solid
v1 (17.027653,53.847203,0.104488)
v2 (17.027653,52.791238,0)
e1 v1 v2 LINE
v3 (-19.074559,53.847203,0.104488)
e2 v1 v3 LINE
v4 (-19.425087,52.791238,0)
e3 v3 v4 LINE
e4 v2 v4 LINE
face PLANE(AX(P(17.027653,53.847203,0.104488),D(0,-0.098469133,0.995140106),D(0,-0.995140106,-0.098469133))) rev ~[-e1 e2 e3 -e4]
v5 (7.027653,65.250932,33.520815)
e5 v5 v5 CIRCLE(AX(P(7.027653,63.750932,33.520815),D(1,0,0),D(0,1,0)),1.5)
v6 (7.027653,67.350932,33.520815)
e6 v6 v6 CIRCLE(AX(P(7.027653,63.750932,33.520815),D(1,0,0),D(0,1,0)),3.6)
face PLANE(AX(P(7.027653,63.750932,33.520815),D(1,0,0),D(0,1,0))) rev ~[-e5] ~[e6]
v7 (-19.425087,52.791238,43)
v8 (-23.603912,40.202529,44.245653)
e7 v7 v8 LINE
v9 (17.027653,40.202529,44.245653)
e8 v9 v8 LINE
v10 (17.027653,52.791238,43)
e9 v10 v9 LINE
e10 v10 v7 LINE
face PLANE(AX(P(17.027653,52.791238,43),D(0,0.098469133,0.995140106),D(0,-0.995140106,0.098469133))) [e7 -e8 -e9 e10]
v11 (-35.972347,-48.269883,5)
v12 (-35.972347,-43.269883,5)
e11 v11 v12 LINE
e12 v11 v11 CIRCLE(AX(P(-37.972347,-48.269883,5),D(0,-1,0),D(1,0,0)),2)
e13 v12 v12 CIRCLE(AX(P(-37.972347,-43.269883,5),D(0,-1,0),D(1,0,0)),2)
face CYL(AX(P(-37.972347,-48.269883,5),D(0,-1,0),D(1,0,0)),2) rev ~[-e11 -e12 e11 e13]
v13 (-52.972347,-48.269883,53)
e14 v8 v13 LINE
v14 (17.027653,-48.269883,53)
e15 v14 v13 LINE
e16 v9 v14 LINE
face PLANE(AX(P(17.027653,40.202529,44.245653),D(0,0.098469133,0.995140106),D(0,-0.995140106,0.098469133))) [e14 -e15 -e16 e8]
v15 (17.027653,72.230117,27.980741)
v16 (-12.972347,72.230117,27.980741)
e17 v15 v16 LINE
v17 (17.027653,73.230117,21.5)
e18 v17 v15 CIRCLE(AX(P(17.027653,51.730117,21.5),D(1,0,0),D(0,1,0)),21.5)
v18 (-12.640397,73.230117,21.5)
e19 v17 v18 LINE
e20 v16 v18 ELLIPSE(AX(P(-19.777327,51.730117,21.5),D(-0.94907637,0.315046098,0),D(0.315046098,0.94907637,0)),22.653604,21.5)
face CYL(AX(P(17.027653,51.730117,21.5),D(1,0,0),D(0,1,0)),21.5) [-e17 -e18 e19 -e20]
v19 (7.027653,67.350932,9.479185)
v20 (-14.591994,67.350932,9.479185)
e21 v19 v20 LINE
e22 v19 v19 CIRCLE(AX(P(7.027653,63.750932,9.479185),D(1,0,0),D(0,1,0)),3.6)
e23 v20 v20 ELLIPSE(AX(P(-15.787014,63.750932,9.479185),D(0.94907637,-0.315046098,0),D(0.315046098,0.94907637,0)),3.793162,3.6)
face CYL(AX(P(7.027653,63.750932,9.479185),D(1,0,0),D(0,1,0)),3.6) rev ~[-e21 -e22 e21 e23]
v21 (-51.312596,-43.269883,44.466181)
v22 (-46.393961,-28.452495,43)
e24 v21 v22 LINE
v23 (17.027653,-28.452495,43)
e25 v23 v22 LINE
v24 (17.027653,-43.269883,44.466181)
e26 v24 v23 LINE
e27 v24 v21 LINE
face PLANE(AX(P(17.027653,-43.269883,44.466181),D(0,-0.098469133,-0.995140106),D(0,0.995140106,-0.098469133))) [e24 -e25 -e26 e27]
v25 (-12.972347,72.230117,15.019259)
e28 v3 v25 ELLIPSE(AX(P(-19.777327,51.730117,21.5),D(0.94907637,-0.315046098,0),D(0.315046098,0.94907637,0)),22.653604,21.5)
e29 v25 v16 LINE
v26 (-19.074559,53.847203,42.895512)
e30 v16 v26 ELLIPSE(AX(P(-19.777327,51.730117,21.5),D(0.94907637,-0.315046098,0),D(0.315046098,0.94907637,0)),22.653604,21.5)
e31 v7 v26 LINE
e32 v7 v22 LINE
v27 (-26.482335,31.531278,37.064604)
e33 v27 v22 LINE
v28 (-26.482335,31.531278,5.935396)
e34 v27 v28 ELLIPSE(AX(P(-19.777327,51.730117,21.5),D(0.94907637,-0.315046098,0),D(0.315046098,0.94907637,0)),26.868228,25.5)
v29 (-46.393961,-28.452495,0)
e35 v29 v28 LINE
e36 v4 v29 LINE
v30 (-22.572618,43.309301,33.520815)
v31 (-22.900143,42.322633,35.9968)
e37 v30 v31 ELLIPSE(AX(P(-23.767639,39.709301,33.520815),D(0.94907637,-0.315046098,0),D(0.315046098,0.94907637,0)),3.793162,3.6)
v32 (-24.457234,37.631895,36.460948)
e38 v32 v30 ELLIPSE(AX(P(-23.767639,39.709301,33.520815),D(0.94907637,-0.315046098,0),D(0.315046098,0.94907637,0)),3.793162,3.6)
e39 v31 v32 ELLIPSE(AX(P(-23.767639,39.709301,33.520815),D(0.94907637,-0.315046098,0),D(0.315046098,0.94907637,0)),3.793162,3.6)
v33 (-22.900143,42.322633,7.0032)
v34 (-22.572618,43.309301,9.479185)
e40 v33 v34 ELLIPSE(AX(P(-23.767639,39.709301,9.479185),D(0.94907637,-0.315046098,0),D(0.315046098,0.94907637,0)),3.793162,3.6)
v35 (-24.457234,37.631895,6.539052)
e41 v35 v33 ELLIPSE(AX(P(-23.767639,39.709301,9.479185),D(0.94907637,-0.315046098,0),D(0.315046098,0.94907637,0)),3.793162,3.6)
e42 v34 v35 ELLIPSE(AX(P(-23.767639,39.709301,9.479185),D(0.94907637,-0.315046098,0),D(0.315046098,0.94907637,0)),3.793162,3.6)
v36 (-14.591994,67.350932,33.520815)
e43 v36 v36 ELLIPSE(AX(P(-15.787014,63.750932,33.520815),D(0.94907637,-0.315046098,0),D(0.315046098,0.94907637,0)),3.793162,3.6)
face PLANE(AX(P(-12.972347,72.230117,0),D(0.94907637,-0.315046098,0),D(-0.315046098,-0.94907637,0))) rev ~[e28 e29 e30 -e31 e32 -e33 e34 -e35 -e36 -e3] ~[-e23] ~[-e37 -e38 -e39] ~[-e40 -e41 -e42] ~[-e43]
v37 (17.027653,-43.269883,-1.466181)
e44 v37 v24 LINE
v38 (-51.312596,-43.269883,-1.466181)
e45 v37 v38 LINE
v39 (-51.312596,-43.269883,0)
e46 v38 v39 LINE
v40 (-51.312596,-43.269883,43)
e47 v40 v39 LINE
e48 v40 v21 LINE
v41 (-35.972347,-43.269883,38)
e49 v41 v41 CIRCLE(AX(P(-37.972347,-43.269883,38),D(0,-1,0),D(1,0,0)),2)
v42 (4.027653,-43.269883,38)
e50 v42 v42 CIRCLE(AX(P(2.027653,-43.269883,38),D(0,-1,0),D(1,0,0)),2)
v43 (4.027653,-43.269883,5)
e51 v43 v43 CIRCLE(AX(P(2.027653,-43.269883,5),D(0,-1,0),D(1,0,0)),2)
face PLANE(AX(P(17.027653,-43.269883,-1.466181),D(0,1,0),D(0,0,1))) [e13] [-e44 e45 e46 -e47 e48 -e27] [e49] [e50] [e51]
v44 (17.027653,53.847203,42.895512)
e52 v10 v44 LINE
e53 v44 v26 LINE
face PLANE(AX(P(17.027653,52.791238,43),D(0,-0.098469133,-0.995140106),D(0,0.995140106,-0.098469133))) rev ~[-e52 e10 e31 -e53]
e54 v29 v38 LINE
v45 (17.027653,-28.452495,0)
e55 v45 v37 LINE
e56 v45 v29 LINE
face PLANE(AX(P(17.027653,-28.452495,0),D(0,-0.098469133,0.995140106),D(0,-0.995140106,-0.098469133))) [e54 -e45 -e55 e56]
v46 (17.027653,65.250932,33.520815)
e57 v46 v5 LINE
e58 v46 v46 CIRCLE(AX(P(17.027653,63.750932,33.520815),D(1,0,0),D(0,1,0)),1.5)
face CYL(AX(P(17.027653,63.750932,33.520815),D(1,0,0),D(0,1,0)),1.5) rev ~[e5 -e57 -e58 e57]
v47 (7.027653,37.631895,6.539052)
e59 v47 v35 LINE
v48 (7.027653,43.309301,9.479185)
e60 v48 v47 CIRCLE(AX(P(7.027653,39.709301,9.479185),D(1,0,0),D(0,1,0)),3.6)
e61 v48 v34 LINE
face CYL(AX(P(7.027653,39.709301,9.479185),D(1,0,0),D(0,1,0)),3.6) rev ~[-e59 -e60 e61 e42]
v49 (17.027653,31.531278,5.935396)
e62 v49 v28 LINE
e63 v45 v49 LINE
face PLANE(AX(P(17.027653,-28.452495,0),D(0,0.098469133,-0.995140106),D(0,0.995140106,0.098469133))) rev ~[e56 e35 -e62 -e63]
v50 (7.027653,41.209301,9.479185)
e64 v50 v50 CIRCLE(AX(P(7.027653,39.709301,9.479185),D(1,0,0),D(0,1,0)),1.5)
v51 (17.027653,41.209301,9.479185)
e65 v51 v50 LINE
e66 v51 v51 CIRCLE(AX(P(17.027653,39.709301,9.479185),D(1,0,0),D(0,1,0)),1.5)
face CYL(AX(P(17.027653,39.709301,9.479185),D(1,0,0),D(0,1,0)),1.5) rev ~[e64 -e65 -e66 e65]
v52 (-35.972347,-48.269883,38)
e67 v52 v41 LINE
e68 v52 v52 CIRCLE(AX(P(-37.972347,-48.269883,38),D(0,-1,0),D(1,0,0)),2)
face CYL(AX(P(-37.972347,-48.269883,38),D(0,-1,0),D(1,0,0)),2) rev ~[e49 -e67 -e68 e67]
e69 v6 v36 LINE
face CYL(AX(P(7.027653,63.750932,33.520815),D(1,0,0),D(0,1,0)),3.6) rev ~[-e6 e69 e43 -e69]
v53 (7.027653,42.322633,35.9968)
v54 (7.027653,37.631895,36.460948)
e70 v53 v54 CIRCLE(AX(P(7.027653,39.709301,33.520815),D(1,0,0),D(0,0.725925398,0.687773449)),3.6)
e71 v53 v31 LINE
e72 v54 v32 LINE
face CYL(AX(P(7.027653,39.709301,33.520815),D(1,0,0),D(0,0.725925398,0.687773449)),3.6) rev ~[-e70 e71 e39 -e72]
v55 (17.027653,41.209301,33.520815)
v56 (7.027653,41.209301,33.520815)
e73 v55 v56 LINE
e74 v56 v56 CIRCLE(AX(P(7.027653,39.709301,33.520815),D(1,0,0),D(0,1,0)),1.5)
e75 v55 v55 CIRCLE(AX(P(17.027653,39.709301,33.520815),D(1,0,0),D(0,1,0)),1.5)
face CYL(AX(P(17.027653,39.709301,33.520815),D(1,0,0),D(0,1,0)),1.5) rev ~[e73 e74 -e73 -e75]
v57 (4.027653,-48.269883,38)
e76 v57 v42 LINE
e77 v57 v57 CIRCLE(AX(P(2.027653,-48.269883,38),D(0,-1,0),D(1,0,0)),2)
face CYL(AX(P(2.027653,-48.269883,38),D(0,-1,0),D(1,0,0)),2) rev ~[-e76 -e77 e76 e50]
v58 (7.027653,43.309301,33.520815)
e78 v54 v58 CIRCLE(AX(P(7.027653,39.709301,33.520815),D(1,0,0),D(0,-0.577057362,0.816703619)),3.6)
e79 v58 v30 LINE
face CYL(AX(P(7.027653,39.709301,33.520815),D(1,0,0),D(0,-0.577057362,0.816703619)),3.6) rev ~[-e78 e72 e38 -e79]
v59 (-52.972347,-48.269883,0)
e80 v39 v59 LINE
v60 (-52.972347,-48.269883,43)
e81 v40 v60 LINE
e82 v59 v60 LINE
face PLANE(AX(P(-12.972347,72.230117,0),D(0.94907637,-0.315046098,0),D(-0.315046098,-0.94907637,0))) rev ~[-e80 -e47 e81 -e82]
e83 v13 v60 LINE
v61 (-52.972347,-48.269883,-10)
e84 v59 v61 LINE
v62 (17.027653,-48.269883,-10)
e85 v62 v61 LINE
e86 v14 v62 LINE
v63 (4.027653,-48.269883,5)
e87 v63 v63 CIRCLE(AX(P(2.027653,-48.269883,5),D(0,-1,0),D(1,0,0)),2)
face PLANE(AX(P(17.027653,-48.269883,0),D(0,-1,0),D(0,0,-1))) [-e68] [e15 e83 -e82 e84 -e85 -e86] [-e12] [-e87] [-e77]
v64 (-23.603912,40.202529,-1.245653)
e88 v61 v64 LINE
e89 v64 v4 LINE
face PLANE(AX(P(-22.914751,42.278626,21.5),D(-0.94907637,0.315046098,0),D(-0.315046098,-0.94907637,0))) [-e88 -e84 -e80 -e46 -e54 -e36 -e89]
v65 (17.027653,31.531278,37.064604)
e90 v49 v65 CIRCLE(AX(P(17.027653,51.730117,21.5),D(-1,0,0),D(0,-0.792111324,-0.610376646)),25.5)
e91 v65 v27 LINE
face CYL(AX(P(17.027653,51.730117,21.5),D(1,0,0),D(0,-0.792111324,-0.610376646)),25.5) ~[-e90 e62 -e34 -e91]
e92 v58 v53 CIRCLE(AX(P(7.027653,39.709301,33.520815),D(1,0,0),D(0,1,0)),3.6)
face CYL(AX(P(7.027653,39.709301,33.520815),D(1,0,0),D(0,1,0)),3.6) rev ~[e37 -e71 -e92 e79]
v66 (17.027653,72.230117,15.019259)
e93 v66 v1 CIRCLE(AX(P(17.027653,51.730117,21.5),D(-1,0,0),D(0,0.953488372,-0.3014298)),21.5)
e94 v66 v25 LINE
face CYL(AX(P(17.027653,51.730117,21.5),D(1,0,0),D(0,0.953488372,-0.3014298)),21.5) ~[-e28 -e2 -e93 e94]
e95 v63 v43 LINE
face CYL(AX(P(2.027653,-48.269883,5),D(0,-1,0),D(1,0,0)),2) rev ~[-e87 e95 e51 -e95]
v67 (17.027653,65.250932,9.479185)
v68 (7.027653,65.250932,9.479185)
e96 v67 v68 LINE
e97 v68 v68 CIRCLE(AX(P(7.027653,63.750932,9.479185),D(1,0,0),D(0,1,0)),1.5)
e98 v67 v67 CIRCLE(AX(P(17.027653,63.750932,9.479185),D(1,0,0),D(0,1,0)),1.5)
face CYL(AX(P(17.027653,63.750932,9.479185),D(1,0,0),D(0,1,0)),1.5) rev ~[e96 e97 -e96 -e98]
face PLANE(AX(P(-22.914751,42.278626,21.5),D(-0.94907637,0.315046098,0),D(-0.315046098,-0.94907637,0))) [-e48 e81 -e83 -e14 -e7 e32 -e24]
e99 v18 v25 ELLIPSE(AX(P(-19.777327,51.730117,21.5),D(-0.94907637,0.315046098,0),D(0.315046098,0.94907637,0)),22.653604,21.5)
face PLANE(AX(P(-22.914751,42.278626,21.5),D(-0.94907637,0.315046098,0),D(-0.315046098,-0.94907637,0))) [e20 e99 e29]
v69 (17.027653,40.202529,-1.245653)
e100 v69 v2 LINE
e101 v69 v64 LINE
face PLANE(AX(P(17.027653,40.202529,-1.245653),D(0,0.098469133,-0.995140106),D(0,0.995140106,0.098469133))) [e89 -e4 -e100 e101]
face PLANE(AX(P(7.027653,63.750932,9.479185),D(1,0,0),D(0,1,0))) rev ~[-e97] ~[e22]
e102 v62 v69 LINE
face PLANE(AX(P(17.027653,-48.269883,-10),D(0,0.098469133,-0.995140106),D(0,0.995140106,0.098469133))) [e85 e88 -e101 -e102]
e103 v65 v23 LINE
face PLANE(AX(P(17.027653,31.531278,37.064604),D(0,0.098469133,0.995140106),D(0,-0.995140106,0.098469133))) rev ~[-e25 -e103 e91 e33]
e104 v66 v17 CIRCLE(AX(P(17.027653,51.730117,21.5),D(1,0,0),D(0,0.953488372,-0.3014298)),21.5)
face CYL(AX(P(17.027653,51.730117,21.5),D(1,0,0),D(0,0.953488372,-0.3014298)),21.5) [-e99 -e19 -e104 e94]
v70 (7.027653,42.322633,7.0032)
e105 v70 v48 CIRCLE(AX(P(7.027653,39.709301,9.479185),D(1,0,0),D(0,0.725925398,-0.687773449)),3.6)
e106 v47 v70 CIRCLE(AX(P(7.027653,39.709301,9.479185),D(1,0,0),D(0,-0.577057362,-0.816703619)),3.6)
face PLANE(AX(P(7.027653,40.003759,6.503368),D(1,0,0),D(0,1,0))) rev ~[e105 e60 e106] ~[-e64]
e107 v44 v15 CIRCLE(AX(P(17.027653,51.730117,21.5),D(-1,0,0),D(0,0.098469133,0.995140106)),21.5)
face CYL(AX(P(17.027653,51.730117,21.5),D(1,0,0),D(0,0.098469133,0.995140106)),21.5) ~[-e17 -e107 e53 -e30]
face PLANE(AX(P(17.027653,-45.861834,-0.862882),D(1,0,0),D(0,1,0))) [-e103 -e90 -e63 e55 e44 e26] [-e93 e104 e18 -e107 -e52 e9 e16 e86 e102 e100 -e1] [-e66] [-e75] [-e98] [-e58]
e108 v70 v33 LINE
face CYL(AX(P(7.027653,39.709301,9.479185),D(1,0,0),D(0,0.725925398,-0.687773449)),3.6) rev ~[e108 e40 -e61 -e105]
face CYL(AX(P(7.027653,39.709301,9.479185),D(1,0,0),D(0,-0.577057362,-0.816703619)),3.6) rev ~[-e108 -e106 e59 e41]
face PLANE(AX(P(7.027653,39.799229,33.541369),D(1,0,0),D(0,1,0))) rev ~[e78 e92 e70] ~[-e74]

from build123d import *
from build123d import SkipClean  # not in build123d's __all__

# Parameters (mm, degrees)
F1_DEPTH = 43
F2_R     = 1.5
F3_DEPTH = 76.2
F4_REACH = 159.0367669999
F5_R     = 2
F6_DEPTH = 5
F7_START = -10
F2_R_2   = 3.6
F7_DEPTH = 40


with BuildPart() as f1:
    # F0 (on Top) → F1 (new body)
    with BuildSketch(Plane.XY):
        Polygon((17.0276526734, -48.2698833057), (17.0276526734, 72.2301166943), (-12.9723473266, 72.2301166943), (-52.9723473266, -48.2698833057), align=None)
    extrude(amount=F1_DEPTH)

    # F2 (on face) → F3 (cut)
    with BuildSketch(Plane.YZ.offset(17.0276526734)):
        with Locations((63.7509319745, 9.4791847198)):
            Circle(F2_R)
        with Locations((63.7509319745, 33.5208152802)):
            Circle(F2_R)
        with Locations((39.7093014141, 33.5208152802)):
            Circle(F2_R)
        with Locations((39.7093014141, 9.4791847198)):
            Circle(F2_R)
        with BuildLine():
            Line((72.2301166943, 36.6657508881), (72.2301166943, 43))
            Line((72.2301166943, 43), (65.4414258951, 43))
            ThreePointArc((65.4414258951, 43), (69.1264984233, 40.1444603767), (72.2301166943, 36.6657508881))
        make_face()
        with BuildLine():
            Line((72.2301166943, 0), (72.2301166943, 6.3342491119))
            ThreePointArc((72.2301166943, 6.3342491119), (69.1264984233, 2.8555396233), (65.4414258951, 0))
            Line((65.4414258951, 0), (72.2301166943, 0))
        make_face()
        with BuildLine():
            ThreePointArc((31.5312779311, 5.93539552), (26.2301166943, 21.5), (31.5312779311, 37.06460448))
            Line((31.5312779311, 37.06460448), (-28.4524949389, 43))
            Line((-28.4524949389, 43), (-43.2698833057, 43))
            Line((-43.2698833057, 43), (-43.2698833057, 0))
            Line((-43.2698833057, 0), (-28.4524949389, 0))
            Line((-28.4524949389, 0), (31.5312779311, 5.93539552))
        make_face()
        with BuildLine():
            ThreePointArc((72.2301166943, 36.6657508881), (69.1264984233, 40.1444603767), (65.4414258951, 43))
            Line((65.4414258951, 43), (52.7912383465, 43))
            Line((52.7912383465, 43), (53.8472030595, 42.8955122706))
            ThreePointArc((53.8472030595, 42.8955122706), (65.276177069, 38.1959350838), (72.2301166943, 27.9807406984))
            Line((72.2301166943, 27.9807406984), (72.2301166943, 36.6657508881))
        make_face()
        with BuildLine():
            Line((72.2301166943, 6.3342491119), (72.2301166943, 15.0192593016))
            ThreePointArc((72.2301166943, 15.0192593016), (65.276177069, 4.8040649162), (53.8472030595, 0.1044877294))
            Line((53.8472030595, 0.1044877294), (52.7912383465, 0))
            Line((52.7912383465, 0), (65.4414258951, 0))
            ThreePointArc((65.4414258951, 0), (69.1264984233, 2.8555396233), (72.2301166943, 6.3342491119))
        make_face()
    extrude(amount=-F3_DEPTH, mode=Mode.SUBTRACT)

    f4_end = Plane(origin=(-22.9147509124, 42.2786258919, 21.5), x_dir=(-0.3150460979, -0.94907637, 0), z_dir=(-0.94907637, 0.3150460979, 0))
    # F2 (on face) → F4 (join, up to a plane its end follows)
    with BuildSketch(Plane.YZ.offset(17.0276526734)):
        Polygon((-43.2698833057, 0), (-48.2698833057, 0), (-48.2698833057, -1.9609309735), (-43.2698833057, -1.466180874), align=None)
        with BuildLine():
            Line((-48.2698833057, -10), (40.2025293734, -1.2456530036))
            ThreePointArc((40.2025293734, -1.2456530036), (39.0953081378, -0.6497542366), (38.0188074935, 0))
            Line((38.0188074935, 0), (-28.4524949389, 0))
            Line((-28.4524949389, 0), (-43.2698833057, -1.466180874))
            Line((-43.2698833057, -1.466180874), (-48.2698833057, -1.9609309735))
            Line((-48.2698833057, -1.9609309735), (-48.2698833057, -10))
        make_face()
        Polygon((-43.2698833057, 44.466180874), (-48.2698833057, 44.9609309735), (-48.2698833057, 43), (-43.2698833057, 43), align=None)
        with BuildLine():
            ThreePointArc((38.0188074935, 43), (39.0953081378, 43.6497542366), (40.2025293734, 44.2456530036))
            Line((40.2025293734, 44.2456530036), (-48.2698833057, 53))
            Line((-48.2698833057, 53), (-48.2698833057, 44.9609309735))
            Line((-48.2698833057, 44.9609309735), (-43.2698833057, 44.466180874))
            Line((-43.2698833057, 44.466180874), (-28.4524949389, 43))
            Line((-28.4524949389, 43), (38.0188074935, 43))
        make_face()
        with BuildLine():
            Line((51.7301166943, 43), (52.7912383465, 43))
            Line((52.7912383465, 43), (40.2025293734, 44.2456530036))
            ThreePointArc((40.2025293734, 44.2456530036), (39.0953081378, 43.6497542366), (38.0188074935, 43))
            Line((38.0188074935, 43), (51.7301166943, 43))
        make_face()
        with BuildLine():
            Line((52.7912383465, 0), (51.7301166943, 0))
            Line((51.7301166943, 0), (38.0188074935, 0))
            ThreePointArc((38.0188074935, 0), (39.0953081378, -0.6497542366), (40.2025293734, -1.2456530036))
            Line((40.2025293734, -1.2456530036), (52.7912383465, 0))
        make_face()
        with BuildLine():
            ThreePointArc((73.2301166943, 21.5), (72.9786460552, 24.7787192622), (72.2301166943, 27.9807406984))
            Line((72.2301166943, 27.9807406984), (72.2301166943, 15.0192593016))
            ThreePointArc((72.2301166943, 15.0192593016), (72.9786460552, 18.2212807378), (73.2301166943, 21.5))
        make_face()
    f4_long = extrude(amount=-F4_REACH, mode=Mode.PRIVATE)
    add(split(f4_long, bisect_by=f4_end, keep=Keep.BOTTOM, mode=Mode.PRIVATE))

    # F5 (on face) → F6 (cut)
    with BuildSketch(Plane.XZ.offset(48.2698833057)):
        with Locations((2.0276526734, 5)):
            Circle(F5_R)
        with Locations((2.0276526734, 38)):
            Circle(F5_R)
        with Locations((-37.9723473266, 38)):
            Circle(F5_R)
        with Locations((-37.9723473266, 5)):
            Circle(F5_R)
    extrude(amount=-F6_DEPTH, mode=Mode.SUBTRACT)

    # F2 (on face) → F7 (cut)
    with BuildSketch(Plane.YZ.offset(17.0276526734).offset(F7_START)):
        with Locations((63.7509319745, 33.5208152802)):
            Circle(F2_R_2)
        with Locations((63.7509319745, 33.5208152802)):
            Circle(F2_R, mode=Mode.SUBTRACT)
        with BuildLine():
            Line((42.3226328457, 35.9967996963), (37.6318949116, 36.4609483083))
            ThreePointArc((37.6318949116, 36.4609483083), (38.0538050247, 30.3240463325), (43.3093014141, 33.5208152802))
            ThreePointArc((43.3093014141, 33.5208152802), (43.0535496969, 34.8534830644), (42.3226328457, 35.9967996963))
        make_face()
        with Locations((39.7093014141, 33.5208152802)):
            Circle(F2_R, mode=Mode.SUBTRACT)
        with BuildLine():
            ThreePointArc((42.3226328457, 35.9967996963), (40.0637902939, 37.1033196604), (37.6318949116, 36.4609483083))
            Line((37.6318949116, 36.4609483083), (42.3226328457, 35.9967996963))
        make_face()
        with BuildLine():
            Line((42.3226328457, 7.0032003037), (37.6318949116, 6.5390516917))
            ThreePointArc((37.6318949116, 6.5390516917), (40.0637902939, 5.8966803396), (42.3226328457, 7.0032003037))
        make_face()
        with BuildLine():
            ThreePointArc((43.3093014141, 9.4791847198), (38.0538050247, 12.6759536675), (37.6318949116, 6.5390516917))
            Line((37.6318949116, 6.5390516917), (42.3226328457, 7.0032003037))
            ThreePointArc((42.3226328457, 7.0032003037), (43.0535496969, 8.1465169356), (43.3093014141, 9.4791847198))
        make_face()
        with Locations((39.7093014141, 9.4791847198)):
            Circle(F2_R, mode=Mode.SUBTRACT)
        with Locations((63.7509319745, 9.4791847198)):
            Circle(F2_R_2)
        with Locations((63.7509319745, 9.4791847198)):
            Circle(F2_R, mode=Mode.SUBTRACT)
    extrude(amount=-F7_DEPTH, mode=Mode.SUBTRACT)


solid = f1.part
